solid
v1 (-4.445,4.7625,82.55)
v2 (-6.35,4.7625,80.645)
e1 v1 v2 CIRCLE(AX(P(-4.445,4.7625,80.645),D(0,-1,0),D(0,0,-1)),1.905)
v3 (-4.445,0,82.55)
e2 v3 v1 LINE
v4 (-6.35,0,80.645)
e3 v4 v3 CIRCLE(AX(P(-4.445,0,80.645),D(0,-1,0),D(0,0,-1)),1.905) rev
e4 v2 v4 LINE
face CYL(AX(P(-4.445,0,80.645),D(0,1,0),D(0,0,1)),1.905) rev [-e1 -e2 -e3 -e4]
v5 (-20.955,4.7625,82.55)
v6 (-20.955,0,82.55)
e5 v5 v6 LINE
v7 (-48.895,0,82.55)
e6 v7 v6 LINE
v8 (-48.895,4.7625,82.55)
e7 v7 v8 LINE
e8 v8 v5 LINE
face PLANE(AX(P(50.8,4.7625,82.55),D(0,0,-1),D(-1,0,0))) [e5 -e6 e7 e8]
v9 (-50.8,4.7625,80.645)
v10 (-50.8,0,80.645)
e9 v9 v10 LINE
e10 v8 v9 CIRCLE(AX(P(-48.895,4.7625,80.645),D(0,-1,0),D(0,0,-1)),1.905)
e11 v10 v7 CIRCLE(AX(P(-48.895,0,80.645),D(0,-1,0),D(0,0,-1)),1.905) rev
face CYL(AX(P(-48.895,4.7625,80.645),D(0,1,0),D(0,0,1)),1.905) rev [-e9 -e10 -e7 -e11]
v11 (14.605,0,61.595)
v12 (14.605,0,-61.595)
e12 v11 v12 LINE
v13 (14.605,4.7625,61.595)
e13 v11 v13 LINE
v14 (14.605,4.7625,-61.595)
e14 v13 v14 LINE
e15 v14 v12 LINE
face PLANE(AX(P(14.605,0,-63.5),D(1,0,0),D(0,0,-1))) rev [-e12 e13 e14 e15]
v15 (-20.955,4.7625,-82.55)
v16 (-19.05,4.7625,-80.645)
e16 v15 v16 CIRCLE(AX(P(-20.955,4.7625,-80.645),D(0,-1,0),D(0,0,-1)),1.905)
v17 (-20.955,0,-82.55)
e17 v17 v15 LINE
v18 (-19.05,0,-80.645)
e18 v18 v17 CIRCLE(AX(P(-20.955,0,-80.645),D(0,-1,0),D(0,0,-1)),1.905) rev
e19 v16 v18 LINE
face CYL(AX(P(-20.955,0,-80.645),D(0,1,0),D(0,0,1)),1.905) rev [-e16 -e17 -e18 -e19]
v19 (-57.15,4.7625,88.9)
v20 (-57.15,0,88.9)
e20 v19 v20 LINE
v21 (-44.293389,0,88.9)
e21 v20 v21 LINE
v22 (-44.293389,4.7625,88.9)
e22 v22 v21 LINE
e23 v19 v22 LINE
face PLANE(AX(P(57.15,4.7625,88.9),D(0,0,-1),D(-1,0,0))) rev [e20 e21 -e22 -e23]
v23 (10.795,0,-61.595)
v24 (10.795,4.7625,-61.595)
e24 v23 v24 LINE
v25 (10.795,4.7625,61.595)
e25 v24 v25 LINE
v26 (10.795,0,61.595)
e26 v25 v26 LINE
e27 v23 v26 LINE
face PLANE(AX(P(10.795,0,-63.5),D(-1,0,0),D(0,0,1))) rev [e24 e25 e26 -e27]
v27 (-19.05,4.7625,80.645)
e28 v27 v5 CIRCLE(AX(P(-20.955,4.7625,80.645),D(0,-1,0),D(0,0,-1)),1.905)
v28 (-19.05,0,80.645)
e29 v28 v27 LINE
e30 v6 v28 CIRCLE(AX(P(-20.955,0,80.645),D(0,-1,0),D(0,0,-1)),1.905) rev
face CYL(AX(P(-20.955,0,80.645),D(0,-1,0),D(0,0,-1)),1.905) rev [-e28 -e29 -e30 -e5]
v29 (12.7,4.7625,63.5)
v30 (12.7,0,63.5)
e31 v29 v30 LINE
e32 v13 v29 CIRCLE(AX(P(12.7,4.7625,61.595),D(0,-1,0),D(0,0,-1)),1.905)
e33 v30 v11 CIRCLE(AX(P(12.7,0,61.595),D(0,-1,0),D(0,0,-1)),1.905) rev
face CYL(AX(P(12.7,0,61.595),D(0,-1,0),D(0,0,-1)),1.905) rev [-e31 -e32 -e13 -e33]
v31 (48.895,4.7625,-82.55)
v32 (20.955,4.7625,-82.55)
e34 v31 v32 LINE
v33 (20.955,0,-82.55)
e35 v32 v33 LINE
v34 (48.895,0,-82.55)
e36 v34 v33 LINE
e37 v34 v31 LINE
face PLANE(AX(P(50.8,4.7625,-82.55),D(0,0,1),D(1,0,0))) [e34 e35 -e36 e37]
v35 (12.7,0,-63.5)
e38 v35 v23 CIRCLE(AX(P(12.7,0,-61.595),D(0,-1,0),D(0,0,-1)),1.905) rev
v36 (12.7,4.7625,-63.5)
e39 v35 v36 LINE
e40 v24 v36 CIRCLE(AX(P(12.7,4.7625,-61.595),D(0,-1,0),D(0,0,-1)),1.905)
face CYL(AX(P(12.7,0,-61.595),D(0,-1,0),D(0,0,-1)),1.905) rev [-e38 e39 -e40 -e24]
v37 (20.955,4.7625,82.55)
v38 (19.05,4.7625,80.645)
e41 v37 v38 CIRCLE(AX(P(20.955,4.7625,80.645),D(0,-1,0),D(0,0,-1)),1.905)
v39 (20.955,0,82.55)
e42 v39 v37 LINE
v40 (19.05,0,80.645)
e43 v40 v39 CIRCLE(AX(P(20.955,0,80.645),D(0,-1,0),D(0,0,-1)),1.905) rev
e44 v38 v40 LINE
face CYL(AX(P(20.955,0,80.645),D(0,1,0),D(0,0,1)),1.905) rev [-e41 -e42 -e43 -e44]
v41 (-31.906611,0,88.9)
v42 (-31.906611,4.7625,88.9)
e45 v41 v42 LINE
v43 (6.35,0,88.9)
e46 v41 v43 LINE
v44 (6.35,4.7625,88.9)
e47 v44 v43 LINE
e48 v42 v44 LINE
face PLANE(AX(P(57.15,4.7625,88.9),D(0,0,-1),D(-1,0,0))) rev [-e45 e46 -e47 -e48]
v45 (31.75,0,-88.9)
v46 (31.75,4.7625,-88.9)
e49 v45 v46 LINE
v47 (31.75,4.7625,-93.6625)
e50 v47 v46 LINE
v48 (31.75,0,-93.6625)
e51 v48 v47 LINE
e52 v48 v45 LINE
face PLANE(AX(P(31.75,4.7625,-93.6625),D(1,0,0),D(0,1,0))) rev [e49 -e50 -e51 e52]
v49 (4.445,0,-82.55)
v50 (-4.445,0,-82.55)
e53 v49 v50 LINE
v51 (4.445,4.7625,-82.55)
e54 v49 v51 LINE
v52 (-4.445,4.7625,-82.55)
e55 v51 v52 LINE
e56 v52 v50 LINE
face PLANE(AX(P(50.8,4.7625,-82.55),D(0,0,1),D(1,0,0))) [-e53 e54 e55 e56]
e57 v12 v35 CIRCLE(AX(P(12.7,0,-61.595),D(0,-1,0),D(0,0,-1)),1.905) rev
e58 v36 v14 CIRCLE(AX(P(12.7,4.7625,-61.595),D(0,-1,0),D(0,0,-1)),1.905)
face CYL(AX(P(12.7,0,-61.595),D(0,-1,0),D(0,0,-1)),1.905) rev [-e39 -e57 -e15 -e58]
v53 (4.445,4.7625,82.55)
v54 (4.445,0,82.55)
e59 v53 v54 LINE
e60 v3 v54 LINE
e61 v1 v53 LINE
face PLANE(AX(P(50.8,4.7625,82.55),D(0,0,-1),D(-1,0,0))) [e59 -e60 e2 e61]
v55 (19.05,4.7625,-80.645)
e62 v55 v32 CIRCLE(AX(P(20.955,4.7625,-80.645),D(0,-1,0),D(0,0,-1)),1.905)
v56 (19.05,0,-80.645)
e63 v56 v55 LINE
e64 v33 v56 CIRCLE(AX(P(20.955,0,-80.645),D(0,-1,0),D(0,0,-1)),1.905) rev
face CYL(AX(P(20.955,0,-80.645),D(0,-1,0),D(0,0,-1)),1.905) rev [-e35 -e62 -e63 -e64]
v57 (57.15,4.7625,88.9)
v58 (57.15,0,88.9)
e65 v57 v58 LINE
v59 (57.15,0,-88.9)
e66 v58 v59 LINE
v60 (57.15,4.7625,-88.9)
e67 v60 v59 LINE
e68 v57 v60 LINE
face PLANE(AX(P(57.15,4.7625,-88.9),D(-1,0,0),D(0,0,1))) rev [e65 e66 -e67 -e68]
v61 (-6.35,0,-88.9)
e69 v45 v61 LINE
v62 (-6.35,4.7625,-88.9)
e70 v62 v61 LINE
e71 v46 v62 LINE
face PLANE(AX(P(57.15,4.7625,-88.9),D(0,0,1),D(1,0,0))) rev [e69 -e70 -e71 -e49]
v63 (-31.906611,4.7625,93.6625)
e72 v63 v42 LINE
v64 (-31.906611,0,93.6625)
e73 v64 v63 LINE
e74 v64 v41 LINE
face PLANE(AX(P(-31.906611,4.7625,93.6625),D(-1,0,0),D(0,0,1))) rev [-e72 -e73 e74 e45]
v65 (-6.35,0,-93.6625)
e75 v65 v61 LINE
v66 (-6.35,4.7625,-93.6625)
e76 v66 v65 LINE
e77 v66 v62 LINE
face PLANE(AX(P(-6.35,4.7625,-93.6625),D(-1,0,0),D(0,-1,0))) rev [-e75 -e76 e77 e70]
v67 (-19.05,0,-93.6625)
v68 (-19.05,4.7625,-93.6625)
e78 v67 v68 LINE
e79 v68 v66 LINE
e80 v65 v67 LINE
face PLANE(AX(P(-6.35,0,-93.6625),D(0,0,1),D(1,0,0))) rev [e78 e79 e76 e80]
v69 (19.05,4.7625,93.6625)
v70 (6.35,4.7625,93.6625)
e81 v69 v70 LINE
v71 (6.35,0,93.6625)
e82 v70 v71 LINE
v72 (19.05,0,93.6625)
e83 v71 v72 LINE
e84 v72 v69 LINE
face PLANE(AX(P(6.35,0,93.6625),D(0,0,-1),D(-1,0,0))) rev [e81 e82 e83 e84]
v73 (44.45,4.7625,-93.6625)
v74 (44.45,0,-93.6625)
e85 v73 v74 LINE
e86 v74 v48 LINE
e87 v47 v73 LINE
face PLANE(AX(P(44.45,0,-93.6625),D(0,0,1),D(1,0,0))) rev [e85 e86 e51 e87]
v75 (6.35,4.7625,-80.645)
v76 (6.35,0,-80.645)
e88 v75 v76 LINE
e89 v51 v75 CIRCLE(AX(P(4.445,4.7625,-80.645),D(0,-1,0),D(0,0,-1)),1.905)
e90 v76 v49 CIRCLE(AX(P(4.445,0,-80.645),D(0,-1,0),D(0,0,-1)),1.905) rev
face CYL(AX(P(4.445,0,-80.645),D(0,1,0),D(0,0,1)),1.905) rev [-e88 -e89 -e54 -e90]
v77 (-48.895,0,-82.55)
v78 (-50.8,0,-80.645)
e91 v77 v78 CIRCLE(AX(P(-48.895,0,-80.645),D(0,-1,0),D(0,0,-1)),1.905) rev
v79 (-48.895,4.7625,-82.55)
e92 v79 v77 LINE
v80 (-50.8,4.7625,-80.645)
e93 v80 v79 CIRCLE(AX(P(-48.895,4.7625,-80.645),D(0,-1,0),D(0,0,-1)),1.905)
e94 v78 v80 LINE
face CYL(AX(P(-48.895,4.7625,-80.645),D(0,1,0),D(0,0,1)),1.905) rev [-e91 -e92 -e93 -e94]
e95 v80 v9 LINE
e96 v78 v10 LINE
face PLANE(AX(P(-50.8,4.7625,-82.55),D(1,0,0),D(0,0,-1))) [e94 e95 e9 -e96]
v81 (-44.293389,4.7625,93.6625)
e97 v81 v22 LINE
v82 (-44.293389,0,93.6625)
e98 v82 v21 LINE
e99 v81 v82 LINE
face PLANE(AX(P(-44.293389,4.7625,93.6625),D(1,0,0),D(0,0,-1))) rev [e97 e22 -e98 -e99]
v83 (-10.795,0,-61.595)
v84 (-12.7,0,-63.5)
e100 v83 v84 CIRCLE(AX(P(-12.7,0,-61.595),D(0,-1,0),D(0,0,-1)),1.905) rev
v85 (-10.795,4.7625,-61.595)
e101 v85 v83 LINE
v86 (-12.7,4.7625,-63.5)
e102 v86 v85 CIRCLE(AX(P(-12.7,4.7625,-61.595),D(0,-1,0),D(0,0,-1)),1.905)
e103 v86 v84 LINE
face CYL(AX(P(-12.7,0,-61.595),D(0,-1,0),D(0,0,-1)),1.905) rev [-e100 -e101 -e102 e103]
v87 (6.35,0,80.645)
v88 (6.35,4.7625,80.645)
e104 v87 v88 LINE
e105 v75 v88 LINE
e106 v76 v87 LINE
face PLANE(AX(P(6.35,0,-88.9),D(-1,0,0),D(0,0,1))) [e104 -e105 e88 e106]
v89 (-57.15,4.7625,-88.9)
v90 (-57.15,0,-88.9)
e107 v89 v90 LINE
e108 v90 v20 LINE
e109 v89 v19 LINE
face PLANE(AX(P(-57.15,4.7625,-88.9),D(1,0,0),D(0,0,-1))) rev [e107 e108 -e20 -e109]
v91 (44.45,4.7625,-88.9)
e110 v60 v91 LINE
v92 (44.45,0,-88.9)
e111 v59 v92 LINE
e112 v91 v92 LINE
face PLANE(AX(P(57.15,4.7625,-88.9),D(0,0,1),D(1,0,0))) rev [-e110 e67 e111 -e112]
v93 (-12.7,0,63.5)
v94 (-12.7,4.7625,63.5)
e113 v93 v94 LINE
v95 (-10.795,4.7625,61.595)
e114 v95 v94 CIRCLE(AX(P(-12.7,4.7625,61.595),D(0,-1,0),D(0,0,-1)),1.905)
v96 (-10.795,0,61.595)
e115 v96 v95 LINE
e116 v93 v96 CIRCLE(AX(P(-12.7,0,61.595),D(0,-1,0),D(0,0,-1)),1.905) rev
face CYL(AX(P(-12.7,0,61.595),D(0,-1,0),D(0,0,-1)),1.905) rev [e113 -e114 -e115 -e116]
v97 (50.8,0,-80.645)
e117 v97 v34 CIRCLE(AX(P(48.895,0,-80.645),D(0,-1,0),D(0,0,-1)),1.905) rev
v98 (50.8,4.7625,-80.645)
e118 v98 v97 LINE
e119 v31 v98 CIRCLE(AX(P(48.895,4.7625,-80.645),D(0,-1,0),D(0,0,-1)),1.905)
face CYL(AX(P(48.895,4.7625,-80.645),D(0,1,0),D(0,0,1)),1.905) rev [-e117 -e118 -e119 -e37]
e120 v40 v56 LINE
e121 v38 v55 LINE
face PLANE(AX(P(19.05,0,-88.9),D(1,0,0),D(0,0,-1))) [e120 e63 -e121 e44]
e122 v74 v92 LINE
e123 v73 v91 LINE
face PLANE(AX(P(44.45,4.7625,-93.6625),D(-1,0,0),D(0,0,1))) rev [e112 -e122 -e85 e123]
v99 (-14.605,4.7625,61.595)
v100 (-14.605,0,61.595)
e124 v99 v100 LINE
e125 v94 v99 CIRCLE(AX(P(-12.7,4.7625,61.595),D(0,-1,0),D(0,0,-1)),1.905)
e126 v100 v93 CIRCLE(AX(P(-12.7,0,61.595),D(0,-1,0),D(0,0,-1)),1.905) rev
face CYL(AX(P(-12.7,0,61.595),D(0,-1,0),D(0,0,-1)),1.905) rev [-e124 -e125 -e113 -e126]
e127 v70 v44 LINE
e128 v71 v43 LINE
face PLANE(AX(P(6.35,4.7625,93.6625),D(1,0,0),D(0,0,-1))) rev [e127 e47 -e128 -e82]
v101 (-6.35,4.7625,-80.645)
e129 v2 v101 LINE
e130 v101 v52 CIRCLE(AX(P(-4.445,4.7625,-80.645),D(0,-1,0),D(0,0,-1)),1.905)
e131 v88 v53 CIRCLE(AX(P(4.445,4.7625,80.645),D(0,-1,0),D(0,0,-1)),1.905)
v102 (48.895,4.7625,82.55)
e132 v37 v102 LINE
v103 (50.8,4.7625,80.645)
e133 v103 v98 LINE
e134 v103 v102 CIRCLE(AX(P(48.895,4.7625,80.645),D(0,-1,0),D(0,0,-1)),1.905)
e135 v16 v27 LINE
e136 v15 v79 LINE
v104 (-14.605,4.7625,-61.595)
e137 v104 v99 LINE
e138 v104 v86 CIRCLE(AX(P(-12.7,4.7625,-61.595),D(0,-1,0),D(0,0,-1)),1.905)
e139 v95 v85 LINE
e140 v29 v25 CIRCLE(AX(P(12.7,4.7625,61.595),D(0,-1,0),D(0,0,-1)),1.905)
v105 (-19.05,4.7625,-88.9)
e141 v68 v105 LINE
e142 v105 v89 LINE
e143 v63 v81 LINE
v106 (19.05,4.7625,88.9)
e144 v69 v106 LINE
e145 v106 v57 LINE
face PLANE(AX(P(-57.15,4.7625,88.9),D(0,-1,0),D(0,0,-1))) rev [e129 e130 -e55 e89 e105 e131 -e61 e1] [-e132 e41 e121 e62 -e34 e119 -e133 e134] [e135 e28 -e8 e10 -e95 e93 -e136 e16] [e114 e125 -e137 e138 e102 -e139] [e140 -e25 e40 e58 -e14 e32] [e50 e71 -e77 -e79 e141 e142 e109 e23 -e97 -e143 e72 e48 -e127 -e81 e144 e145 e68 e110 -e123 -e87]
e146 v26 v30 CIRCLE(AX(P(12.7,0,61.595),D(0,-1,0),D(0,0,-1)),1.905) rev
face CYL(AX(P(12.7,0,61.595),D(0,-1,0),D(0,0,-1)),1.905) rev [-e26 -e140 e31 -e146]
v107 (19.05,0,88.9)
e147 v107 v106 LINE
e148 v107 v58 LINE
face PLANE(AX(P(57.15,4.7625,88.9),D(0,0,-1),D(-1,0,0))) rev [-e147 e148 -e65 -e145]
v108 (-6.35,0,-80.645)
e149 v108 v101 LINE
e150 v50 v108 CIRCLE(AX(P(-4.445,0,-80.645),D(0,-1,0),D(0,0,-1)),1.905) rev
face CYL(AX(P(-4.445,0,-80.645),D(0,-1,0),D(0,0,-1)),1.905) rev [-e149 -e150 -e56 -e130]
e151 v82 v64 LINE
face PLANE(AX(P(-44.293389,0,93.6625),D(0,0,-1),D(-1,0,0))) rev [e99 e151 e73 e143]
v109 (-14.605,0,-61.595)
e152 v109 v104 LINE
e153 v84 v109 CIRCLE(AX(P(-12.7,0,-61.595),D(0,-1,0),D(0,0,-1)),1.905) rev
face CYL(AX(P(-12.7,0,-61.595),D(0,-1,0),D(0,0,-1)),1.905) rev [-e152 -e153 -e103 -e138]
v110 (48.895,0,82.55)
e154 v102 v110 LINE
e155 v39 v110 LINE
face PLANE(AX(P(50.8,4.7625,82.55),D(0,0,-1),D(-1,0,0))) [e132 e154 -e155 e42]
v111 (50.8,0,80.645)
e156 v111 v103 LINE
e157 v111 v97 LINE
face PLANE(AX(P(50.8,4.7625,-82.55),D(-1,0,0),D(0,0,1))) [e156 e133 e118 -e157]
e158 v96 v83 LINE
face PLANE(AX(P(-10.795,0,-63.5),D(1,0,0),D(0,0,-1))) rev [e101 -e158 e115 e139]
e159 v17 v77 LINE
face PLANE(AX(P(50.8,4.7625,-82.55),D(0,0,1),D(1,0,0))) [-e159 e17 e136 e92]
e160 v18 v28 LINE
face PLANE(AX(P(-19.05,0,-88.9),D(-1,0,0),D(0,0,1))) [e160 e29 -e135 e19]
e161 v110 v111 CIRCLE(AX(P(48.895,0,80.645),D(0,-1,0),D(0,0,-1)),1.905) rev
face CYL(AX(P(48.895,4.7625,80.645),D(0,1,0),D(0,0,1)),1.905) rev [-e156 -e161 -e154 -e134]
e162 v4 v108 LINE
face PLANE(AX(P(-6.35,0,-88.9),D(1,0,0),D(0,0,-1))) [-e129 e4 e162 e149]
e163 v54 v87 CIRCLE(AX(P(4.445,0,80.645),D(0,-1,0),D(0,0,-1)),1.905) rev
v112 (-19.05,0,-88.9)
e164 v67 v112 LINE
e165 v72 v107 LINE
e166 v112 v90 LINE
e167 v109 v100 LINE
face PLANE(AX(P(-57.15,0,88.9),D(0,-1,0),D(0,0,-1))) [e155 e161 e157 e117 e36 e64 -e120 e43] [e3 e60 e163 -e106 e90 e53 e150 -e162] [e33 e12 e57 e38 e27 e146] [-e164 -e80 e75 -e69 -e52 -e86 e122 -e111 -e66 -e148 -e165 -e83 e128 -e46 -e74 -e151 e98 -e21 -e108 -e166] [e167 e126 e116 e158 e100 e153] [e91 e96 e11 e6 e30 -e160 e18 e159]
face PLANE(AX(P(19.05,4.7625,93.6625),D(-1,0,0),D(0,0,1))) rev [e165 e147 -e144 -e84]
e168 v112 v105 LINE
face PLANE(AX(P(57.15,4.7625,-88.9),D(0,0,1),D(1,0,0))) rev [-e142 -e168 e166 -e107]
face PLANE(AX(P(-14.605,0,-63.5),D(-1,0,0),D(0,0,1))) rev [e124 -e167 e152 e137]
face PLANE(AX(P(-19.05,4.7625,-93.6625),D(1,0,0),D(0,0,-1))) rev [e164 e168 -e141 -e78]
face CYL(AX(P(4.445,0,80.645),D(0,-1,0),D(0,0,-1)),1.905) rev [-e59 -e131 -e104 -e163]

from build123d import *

# Parameters (mm, degrees)
SKETCH1_W           = 114.3
SKETCH1_H           = 177.8
SKETCH1_W_2         = 101.6
SKETCH1_H_2         = 165.1
BOSS_EXTRUDE1_DEPTH = 4.7625
SKETCH2_W           = 12.38677804
SKETCH2_H           = 4.7625
SKETCH2_W_2         = 12.7
BOSS_EXTRUDE2_DEPTH = 4.7625
SKETCH3_W           = 12.7
SKETCH3_H           = 4.7625
BOSS_EXTRUDE3_DEPTH = 4.7625
SKETCH4_W           = 12.7
SKETCH4_H           = 177.8
SKETCH4_W_2         = 3.81
SKETCH4_H_2         = 127
BOSS_EXTRUDE4_DEPTH = 4.7625
FILLET1_R           = 1.905


with BuildPart() as part:
    # Sketch1 → Boss-Extrude1 (new body)
    with BuildSketch(Plane(origin=(0, 0, 0), x_dir=(1, 0, 0), z_dir=(0, 1, 0))):
        Rectangle(SKETCH1_W, SKETCH1_H)
        Rectangle(SKETCH1_W_2, SKETCH1_H_2, mode=Mode.SUBTRACT)
    extrude(amount=BOSS_EXTRUDE1_DEPTH)

    # Sketch2 → Boss-Extrude2 (add)
    with BuildSketch(Plane.XY.offset(88.9)):
        with Locations((-38.1, 2.38125)):
            Rectangle(SKETCH2_W, SKETCH2_H)
        with Locations((12.7, 2.38125)):
            Rectangle(SKETCH2_W_2, SKETCH2_H)
    extrude(amount=BOSS_EXTRUDE2_DEPTH)

    # Sketch3 → Boss-Extrude3 (add)
    with BuildSketch(Plane(origin=(0, 0, -88.9), x_dir=(-1, 0, 0), z_dir=(0, 0, -1))):
        with Locations((-38.1, 2.38125)):
            Rectangle(SKETCH3_W, SKETCH3_H)
        with Locations((12.7, 2.38125)):
            Rectangle(SKETCH3_W, SKETCH3_H)
    extrude(amount=BOSS_EXTRUDE3_DEPTH)

    # Sketch4 → Boss-Extrude4 (add)
    # profile 1 of 2: a face of its own
    with BuildSketch(Plane(origin=(0, 4.7625, 0), x_dir=(-1, 0, 0), z_dir=(0, 1, 0))):
        with Locations((12.7, 0)):
            Rectangle(SKETCH4_W, SKETCH4_H)
        with Locations((12.7, 0)):
            Rectangle(SKETCH4_W_2, SKETCH4_H_2, mode=Mode.SUBTRACT)
    # profile 2 of 2: a face of its own
    with BuildSketch(Plane(origin=(0, 4.7625, 0), x_dir=(-1, 0, 0), z_dir=(0, 1, 0))):
        with Locations((-12.7, 0)):
            Rectangle(SKETCH4_W, SKETCH4_H)
        with Locations((-12.7, 0)):
            Rectangle(SKETCH4_W_2, SKETCH4_H_2, mode=Mode.SUBTRACT)
    extrude(amount=-BOSS_EXTRUDE4_DEPTH)

    # Fillet1
    fillet1_edges = [part.edges().sort_by_distance(p)[0] for p in [
        (-10.795, 2.38125, -63.5),
        (-14.605, 2.38125, -63.5),
        (10.795, 2.38125, -63.5),
        (14.605, 2.38125, -63.5),
        (-10.795, 2.38125, 63.5),
        (-14.605, 2.38125, 63.5),
        (10.795, 2.38125, 63.5),
        (14.605, 2.38125, 63.5),
        (-6.35, 2.38125, 82.55),
        (6.35, 2.38125, 82.55),
        (-6.35, 2.38125, -82.55),
        (6.35, 2.38125, -82.55),
        (-19.05, 2.38125, -82.55),
        (-50.8, 2.38125, -82.55),
        (-50.8, 2.38125, 82.55),
        (-19.05, 2.38125, 82.55),
        (19.05, 2.38125, 82.55),
        (50.8, 2.38125, 82.55),
        (19.05, 2.38125, -82.55),
        (50.8, 2.38125, -82.55),
    ]]
    fillet(fillet1_edges, radius=FILLET1_R - 0.0001)  # a hair under: the kernel refuses the full size


solid = part.part
